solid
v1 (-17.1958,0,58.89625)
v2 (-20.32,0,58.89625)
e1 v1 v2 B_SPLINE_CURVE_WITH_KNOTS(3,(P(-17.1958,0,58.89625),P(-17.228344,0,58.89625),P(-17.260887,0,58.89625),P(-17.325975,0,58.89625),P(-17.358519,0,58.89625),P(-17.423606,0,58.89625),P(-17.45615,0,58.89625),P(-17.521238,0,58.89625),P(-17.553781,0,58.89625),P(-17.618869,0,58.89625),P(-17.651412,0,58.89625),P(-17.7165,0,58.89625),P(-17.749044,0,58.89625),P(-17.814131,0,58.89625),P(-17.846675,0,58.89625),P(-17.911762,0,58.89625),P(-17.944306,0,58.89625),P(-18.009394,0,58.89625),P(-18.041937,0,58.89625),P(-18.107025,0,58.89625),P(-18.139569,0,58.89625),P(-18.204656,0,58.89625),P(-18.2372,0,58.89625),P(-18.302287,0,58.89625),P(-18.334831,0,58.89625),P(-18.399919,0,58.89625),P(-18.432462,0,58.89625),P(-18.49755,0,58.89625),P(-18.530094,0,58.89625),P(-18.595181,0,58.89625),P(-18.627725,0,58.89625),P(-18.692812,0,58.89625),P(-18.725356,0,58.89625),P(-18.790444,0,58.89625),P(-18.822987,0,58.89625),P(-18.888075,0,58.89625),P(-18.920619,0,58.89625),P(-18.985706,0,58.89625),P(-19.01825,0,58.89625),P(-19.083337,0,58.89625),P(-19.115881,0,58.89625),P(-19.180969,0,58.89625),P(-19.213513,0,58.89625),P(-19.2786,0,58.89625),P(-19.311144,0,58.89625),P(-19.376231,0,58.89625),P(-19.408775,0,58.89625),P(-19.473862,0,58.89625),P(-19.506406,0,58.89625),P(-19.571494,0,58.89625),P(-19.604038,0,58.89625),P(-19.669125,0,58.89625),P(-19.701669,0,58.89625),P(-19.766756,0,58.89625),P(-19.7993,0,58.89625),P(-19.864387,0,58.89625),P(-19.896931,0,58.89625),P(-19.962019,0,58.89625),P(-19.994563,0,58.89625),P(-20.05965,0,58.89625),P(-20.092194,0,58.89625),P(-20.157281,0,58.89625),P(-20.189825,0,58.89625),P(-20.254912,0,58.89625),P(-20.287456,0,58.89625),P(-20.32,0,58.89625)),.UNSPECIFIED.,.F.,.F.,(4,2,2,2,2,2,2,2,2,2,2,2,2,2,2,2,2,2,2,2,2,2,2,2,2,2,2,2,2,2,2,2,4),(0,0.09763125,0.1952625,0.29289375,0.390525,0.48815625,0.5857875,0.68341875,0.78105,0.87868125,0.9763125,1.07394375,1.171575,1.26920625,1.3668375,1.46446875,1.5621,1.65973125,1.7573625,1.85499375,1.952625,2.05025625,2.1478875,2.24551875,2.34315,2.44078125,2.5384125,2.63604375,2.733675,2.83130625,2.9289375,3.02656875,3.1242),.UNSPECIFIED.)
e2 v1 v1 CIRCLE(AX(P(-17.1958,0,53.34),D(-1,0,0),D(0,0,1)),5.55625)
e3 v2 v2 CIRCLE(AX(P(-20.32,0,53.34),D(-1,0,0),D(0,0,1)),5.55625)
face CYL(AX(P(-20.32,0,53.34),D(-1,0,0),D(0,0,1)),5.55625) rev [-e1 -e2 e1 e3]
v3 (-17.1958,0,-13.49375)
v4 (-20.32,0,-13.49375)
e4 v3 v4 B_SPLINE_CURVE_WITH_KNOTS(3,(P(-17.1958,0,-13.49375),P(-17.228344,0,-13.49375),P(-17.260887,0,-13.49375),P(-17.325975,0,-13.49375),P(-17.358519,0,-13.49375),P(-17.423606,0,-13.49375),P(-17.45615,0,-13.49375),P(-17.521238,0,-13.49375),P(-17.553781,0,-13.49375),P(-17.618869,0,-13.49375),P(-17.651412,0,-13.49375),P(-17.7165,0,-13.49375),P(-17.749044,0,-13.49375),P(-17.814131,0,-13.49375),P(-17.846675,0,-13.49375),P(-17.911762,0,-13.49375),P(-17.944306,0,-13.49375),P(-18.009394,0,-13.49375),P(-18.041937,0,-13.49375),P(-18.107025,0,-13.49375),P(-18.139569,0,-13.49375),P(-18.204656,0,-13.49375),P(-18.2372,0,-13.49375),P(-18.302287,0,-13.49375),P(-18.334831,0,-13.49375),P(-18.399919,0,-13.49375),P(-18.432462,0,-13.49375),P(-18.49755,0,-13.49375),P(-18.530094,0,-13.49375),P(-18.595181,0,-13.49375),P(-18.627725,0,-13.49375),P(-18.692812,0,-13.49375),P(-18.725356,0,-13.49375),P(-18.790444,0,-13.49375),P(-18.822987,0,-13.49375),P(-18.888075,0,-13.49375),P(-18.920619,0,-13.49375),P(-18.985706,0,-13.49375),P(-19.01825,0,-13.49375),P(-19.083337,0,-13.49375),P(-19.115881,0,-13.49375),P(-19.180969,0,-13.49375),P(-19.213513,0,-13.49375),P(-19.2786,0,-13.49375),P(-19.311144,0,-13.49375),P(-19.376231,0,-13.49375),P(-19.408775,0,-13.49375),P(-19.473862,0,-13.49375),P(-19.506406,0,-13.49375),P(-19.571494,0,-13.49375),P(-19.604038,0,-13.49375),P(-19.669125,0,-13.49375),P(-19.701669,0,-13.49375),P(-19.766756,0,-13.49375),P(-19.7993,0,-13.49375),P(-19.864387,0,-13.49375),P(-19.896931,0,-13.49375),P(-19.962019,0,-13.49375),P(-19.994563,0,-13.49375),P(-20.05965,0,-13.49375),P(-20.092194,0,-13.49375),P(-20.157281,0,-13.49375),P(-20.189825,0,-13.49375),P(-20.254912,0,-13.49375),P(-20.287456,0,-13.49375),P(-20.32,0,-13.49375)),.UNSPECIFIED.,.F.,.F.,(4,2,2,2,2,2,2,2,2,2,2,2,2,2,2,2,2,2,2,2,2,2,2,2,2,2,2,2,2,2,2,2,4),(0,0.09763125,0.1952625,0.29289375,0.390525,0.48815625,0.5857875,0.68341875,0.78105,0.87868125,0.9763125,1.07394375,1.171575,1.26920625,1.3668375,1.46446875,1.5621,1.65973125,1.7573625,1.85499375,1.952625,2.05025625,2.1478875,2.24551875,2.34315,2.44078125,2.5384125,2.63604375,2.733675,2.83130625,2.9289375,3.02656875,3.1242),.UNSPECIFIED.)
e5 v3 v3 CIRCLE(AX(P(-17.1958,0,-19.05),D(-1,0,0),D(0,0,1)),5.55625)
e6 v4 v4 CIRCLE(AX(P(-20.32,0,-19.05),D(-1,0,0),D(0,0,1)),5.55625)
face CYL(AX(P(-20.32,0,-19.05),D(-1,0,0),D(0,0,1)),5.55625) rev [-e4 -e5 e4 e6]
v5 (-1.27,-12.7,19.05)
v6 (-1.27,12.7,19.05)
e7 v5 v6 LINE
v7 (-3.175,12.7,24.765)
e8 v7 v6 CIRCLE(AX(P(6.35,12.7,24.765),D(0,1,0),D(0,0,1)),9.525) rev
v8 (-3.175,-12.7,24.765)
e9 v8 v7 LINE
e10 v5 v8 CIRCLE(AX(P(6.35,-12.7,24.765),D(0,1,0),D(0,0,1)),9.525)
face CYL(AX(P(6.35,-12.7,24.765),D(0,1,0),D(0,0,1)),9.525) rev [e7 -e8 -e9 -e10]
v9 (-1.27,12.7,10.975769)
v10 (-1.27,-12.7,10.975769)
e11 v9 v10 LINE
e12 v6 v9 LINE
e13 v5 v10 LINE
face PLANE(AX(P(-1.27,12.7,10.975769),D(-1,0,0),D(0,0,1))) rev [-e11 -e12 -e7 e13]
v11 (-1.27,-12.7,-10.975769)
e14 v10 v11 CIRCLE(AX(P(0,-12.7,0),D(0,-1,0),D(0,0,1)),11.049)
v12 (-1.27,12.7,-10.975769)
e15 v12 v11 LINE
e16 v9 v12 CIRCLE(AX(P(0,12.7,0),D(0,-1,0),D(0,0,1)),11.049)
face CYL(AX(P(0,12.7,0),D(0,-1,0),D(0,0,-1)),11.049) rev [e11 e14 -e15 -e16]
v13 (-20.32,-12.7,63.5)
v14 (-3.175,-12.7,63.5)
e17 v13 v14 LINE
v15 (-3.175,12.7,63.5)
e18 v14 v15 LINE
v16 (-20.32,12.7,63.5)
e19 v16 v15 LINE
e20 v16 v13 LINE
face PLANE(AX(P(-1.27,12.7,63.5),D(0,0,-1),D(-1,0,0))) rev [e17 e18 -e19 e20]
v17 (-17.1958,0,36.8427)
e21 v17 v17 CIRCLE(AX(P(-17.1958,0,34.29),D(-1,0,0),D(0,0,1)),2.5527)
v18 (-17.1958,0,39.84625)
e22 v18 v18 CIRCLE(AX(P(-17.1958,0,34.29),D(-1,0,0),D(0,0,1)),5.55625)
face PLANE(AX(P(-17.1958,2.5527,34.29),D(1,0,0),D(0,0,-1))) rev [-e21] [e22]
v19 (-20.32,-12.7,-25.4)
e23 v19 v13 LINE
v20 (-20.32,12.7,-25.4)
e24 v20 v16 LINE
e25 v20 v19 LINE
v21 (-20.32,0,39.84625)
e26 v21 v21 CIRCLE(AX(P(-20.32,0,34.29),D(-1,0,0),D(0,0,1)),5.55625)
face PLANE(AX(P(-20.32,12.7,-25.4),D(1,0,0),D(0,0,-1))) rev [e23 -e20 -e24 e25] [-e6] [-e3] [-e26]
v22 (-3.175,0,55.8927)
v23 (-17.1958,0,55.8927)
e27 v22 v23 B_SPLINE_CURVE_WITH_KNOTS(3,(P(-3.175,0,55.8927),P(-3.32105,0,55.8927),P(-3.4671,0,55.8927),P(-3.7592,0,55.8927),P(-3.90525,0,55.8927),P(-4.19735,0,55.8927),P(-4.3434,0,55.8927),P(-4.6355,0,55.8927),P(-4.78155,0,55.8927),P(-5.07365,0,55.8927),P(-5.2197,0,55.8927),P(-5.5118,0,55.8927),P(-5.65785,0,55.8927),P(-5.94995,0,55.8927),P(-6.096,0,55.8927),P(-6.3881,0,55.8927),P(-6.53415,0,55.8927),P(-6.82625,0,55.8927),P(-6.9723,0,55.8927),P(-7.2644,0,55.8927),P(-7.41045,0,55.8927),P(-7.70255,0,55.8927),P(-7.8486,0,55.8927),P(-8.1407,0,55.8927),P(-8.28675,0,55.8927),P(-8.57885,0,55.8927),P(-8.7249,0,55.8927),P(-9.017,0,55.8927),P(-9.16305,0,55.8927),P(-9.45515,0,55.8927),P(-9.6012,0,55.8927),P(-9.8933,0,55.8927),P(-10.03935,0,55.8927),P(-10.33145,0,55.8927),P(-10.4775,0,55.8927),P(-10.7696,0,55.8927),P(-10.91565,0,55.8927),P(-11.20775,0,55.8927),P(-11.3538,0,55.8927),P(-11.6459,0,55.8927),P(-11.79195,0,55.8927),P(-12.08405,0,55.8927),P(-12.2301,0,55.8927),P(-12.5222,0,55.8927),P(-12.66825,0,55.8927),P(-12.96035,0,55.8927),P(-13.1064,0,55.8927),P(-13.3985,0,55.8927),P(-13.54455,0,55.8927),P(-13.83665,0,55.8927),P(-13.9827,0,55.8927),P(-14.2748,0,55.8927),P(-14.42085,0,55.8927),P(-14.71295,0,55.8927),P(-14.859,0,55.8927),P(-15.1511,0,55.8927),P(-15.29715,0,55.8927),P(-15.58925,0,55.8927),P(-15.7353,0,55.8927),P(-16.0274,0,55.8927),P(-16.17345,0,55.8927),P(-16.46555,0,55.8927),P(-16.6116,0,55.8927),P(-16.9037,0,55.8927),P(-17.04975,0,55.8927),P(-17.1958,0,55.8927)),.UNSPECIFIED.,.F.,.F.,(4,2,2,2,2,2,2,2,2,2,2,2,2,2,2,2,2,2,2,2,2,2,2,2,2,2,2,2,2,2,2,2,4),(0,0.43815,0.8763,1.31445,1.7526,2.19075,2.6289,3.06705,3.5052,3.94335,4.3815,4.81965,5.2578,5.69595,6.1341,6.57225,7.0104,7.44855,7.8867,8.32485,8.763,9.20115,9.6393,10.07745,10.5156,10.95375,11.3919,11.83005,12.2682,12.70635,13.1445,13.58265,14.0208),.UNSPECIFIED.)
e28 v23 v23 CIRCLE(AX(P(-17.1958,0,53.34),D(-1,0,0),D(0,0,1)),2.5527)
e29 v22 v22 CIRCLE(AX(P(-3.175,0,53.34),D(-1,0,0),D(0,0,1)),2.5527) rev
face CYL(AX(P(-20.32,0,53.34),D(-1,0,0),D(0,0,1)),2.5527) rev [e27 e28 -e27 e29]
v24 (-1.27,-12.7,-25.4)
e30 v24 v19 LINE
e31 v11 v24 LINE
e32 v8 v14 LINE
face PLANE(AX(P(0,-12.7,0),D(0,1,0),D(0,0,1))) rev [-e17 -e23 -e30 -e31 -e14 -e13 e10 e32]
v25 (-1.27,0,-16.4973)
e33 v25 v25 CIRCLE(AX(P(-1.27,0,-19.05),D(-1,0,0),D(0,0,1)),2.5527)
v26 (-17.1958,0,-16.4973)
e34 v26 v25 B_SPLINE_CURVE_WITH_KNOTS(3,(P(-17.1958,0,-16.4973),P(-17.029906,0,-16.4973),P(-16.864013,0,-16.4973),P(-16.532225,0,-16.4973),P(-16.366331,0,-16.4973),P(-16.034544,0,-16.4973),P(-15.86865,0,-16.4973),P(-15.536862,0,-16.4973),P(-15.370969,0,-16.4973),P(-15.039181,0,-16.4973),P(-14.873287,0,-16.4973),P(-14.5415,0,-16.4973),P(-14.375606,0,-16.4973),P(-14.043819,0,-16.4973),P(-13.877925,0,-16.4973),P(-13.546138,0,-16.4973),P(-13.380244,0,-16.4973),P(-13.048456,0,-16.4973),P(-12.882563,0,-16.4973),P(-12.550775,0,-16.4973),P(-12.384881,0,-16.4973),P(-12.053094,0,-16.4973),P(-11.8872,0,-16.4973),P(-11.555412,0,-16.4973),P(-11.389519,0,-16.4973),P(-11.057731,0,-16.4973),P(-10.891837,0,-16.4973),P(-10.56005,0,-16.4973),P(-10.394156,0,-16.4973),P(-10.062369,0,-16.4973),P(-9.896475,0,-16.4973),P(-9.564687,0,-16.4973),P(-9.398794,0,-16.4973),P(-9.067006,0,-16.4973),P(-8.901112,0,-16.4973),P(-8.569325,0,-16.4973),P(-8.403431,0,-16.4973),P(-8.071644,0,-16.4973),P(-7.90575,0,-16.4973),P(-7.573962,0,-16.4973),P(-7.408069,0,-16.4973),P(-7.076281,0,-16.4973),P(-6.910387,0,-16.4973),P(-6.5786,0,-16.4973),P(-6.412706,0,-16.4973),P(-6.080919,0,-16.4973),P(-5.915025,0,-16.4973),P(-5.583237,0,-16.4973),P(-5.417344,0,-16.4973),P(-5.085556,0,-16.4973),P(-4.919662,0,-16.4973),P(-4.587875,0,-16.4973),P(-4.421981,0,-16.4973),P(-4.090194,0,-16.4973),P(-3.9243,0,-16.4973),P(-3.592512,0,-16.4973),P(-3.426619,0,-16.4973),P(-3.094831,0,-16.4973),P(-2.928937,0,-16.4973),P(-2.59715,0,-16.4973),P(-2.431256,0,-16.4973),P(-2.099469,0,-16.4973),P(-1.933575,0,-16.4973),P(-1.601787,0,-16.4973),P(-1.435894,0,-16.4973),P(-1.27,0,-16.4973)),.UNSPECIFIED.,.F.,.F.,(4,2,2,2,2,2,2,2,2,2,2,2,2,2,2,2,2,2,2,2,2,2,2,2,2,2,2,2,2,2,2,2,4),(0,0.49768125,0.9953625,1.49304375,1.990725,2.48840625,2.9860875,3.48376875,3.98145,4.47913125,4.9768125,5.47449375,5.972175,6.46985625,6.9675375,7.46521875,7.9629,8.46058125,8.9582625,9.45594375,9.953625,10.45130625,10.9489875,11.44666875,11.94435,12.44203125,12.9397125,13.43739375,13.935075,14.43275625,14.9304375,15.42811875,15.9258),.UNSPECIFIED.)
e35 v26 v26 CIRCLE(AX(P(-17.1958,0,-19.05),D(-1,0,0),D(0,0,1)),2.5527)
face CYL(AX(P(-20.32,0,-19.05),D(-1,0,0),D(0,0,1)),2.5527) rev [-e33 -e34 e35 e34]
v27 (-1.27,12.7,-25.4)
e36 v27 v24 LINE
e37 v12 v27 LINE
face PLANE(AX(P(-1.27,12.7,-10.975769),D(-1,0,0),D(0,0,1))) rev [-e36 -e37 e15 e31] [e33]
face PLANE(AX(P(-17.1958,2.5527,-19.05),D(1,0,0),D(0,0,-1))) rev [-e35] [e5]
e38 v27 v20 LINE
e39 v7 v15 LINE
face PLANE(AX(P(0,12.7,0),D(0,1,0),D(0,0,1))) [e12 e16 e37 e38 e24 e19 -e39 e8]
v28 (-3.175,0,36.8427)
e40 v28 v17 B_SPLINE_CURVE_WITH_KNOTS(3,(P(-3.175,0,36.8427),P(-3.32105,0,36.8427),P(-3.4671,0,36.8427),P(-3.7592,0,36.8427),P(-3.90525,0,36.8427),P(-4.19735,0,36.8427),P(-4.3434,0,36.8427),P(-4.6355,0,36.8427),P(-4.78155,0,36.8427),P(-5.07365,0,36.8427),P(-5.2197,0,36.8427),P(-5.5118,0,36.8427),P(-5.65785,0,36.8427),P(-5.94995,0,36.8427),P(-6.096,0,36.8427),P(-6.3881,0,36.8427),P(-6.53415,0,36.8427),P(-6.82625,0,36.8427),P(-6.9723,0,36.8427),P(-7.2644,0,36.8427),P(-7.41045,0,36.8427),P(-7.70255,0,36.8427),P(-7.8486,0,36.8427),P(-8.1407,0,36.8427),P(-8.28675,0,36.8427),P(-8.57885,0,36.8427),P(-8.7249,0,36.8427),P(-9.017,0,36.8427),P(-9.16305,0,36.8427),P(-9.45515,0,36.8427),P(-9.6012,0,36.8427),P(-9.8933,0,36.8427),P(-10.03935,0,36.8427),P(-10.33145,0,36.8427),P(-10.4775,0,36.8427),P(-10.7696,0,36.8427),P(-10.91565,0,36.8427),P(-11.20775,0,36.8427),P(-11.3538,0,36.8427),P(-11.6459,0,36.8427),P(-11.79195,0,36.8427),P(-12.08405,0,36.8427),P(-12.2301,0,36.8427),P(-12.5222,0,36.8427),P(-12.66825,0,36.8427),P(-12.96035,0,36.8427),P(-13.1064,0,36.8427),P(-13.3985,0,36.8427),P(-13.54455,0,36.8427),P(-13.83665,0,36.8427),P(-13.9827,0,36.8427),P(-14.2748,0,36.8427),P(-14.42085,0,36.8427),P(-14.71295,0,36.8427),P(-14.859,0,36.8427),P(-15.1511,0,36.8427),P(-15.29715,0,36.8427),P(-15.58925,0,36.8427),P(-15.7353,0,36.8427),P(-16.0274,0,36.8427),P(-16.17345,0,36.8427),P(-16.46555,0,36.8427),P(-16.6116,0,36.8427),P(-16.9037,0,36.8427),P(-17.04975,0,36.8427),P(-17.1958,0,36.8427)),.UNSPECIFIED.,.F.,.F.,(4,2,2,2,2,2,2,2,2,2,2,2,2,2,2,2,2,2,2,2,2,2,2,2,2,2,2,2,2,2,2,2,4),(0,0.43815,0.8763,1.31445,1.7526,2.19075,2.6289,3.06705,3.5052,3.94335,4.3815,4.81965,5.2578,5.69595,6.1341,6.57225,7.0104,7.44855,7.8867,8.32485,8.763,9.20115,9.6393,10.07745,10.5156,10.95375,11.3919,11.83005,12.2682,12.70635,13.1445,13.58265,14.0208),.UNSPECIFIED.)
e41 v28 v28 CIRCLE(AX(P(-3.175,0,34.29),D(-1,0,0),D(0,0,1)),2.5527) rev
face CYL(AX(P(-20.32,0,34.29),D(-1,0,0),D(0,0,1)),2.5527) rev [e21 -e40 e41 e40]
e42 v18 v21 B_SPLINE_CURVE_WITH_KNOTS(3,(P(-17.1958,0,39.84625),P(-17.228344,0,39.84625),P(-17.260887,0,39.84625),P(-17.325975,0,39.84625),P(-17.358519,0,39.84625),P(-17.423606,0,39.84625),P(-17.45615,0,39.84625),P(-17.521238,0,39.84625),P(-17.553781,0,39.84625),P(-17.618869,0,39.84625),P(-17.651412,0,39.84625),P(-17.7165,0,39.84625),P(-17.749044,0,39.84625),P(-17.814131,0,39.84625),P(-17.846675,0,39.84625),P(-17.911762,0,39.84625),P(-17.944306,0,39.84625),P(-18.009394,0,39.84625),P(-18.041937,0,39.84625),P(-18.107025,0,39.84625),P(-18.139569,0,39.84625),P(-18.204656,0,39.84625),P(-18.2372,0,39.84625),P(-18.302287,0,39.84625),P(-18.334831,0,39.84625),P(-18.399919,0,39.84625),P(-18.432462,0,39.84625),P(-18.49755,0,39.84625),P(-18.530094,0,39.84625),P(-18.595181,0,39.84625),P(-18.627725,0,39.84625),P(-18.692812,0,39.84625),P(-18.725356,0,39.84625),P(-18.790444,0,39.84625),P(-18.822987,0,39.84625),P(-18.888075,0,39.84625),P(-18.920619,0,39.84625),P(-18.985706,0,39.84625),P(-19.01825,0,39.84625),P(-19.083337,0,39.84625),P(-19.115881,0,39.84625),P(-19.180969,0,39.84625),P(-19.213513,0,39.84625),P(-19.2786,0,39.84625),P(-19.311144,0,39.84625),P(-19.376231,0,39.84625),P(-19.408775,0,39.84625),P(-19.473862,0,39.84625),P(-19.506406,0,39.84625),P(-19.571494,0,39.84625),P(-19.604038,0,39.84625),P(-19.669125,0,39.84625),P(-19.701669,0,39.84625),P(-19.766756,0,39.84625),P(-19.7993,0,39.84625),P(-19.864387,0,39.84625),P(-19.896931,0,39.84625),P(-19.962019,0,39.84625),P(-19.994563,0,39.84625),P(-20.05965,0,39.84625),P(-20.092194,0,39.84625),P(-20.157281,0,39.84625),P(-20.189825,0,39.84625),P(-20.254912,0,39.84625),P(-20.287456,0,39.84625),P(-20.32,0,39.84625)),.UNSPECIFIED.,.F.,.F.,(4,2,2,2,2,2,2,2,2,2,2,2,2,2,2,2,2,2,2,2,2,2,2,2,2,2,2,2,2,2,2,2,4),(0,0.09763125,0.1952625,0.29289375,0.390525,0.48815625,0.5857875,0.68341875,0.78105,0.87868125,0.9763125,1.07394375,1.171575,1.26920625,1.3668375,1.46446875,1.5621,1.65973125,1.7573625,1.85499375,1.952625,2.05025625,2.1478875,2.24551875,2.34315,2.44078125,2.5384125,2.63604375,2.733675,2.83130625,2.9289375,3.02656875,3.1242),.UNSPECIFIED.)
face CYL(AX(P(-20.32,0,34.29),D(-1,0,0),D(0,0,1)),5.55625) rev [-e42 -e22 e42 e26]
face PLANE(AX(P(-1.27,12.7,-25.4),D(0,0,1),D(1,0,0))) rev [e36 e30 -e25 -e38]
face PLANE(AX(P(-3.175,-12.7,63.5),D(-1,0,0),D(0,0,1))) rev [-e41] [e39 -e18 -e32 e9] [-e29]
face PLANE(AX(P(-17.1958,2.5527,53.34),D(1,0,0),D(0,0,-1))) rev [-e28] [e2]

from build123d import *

# Parameters (mm, degrees)
BOSS_EXTRUDE1_DEPTH                                 = 12.7
CBORE_FOR_10_BINDING_HEAD_MACHINE_SCREW_D           = 5.1054
CBORE_FOR_10_BINDING_HEAD_MACHINE_SCREW_DEPTH       = 508
CBORE_FOR_10_BINDING_HEAD_MACHINE_SCREW_CBORE_D     = 11.1125
CBORE_FOR_10_BINDING_HEAD_MACHINE_SCREW_CBORE_DEPTH = 3.1242
CBORE_FOR_10_BINDING_HEAD_MACHINE_SCREW_TIP         = 1.533816902
SKETCH7_W                                           = 1.905
SKETCH7_H                                           = 44.45
CUT_EXTRUDE1_DEPTH                                  = 72.346425278
FILLET1_R                                           = 9.525


with BuildPart() as part:
    # Sketch1 → Boss-Extrude1 (new, symmetric)
    with BuildSketch(Plane(origin=(0, 0, 0), x_dir=(1, 0, 0), z_dir=(0, 1, 0))):
        with BuildLine():
            Line((-1.27, 10.975768811), (-1.27, 25.4))
            Line((-1.27, 25.4), (-20.32, 25.4))
            Line((-20.32, 25.4), (-20.32, -63.5))
            Line((-20.32, -63.5), (-1.27, -63.5))
            Line((-1.27, -63.5), (-1.27, -10.975768811))
            ThreePointArc((-1.27, -10.975768811), (-11.049, 0), (-1.27, 10.975768811))
        make_face()
    extrude(amount=BOSS_EXTRUDE1_DEPTH, both=True)

    # CBORE for #10 Binding Head Machine Screw1
    with Locations(Plane.ZY.offset(20.32)):
        with Locations((-19.05, 0), (34.29, 0), (53.34, 0)):
            CounterBoreHole(CBORE_FOR_10_BINDING_HEAD_MACHINE_SCREW_D / 2, CBORE_FOR_10_BINDING_HEAD_MACHINE_SCREW_CBORE_D / 2, CBORE_FOR_10_BINDING_HEAD_MACHINE_SCREW_CBORE_DEPTH, depth=CBORE_FOR_10_BINDING_HEAD_MACHINE_SCREW_DEPTH)
            with Locations((0, 0, -(CBORE_FOR_10_BINDING_HEAD_MACHINE_SCREW_DEPTH + CBORE_FOR_10_BINDING_HEAD_MACHINE_SCREW_TIP / 2))):  # 118° drill point
                Cone(0, CBORE_FOR_10_BINDING_HEAD_MACHINE_SCREW_D / 2, CBORE_FOR_10_BINDING_HEAD_MACHINE_SCREW_TIP, mode=Mode.SUBTRACT)

    # Sketch7 → Cut-Extrude1 (cut, through all)
    with BuildSketch(Plane(origin=(0, 12.7, 0), x_dir=(1, 0, 0), z_dir=(0, 1, 0))):
        with Locations((-2.2225, -41.275)):
            Rectangle(SKETCH7_W, SKETCH7_H)
    extrude(amount=-CUT_EXTRUDE1_DEPTH, mode=Mode.SUBTRACT)

    # Fillet1
    # the kernel refuses this fillet: 9.525 mm, written as the material it adds along each edge
    with BuildSketch(Plane(origin=(-3.175, 12.7, 19.05), x_dir=(1, 0, 0), z_dir=(0, -1, 0))) as fillet1_piece_1:
        with BuildLine():
            CenterArc((9.525, 5.715), FILLET1_R, 180, 36.869897646)
            Line((0, 5.715), (-0.1905, 5.715))
            Line((-0.1905, 5.715), (-0.1905, 0))
            Line((-0.1905, 0), (0, -0.1905))
            ThreePointArc((0, -0.1905), (0.9525, -0.1905), (1.7526, -0.1143))
            Line((1.7526, -0.1143), (1.905, 0))
        make_face()
    extrude(amount=25.4)


solid = part.part
